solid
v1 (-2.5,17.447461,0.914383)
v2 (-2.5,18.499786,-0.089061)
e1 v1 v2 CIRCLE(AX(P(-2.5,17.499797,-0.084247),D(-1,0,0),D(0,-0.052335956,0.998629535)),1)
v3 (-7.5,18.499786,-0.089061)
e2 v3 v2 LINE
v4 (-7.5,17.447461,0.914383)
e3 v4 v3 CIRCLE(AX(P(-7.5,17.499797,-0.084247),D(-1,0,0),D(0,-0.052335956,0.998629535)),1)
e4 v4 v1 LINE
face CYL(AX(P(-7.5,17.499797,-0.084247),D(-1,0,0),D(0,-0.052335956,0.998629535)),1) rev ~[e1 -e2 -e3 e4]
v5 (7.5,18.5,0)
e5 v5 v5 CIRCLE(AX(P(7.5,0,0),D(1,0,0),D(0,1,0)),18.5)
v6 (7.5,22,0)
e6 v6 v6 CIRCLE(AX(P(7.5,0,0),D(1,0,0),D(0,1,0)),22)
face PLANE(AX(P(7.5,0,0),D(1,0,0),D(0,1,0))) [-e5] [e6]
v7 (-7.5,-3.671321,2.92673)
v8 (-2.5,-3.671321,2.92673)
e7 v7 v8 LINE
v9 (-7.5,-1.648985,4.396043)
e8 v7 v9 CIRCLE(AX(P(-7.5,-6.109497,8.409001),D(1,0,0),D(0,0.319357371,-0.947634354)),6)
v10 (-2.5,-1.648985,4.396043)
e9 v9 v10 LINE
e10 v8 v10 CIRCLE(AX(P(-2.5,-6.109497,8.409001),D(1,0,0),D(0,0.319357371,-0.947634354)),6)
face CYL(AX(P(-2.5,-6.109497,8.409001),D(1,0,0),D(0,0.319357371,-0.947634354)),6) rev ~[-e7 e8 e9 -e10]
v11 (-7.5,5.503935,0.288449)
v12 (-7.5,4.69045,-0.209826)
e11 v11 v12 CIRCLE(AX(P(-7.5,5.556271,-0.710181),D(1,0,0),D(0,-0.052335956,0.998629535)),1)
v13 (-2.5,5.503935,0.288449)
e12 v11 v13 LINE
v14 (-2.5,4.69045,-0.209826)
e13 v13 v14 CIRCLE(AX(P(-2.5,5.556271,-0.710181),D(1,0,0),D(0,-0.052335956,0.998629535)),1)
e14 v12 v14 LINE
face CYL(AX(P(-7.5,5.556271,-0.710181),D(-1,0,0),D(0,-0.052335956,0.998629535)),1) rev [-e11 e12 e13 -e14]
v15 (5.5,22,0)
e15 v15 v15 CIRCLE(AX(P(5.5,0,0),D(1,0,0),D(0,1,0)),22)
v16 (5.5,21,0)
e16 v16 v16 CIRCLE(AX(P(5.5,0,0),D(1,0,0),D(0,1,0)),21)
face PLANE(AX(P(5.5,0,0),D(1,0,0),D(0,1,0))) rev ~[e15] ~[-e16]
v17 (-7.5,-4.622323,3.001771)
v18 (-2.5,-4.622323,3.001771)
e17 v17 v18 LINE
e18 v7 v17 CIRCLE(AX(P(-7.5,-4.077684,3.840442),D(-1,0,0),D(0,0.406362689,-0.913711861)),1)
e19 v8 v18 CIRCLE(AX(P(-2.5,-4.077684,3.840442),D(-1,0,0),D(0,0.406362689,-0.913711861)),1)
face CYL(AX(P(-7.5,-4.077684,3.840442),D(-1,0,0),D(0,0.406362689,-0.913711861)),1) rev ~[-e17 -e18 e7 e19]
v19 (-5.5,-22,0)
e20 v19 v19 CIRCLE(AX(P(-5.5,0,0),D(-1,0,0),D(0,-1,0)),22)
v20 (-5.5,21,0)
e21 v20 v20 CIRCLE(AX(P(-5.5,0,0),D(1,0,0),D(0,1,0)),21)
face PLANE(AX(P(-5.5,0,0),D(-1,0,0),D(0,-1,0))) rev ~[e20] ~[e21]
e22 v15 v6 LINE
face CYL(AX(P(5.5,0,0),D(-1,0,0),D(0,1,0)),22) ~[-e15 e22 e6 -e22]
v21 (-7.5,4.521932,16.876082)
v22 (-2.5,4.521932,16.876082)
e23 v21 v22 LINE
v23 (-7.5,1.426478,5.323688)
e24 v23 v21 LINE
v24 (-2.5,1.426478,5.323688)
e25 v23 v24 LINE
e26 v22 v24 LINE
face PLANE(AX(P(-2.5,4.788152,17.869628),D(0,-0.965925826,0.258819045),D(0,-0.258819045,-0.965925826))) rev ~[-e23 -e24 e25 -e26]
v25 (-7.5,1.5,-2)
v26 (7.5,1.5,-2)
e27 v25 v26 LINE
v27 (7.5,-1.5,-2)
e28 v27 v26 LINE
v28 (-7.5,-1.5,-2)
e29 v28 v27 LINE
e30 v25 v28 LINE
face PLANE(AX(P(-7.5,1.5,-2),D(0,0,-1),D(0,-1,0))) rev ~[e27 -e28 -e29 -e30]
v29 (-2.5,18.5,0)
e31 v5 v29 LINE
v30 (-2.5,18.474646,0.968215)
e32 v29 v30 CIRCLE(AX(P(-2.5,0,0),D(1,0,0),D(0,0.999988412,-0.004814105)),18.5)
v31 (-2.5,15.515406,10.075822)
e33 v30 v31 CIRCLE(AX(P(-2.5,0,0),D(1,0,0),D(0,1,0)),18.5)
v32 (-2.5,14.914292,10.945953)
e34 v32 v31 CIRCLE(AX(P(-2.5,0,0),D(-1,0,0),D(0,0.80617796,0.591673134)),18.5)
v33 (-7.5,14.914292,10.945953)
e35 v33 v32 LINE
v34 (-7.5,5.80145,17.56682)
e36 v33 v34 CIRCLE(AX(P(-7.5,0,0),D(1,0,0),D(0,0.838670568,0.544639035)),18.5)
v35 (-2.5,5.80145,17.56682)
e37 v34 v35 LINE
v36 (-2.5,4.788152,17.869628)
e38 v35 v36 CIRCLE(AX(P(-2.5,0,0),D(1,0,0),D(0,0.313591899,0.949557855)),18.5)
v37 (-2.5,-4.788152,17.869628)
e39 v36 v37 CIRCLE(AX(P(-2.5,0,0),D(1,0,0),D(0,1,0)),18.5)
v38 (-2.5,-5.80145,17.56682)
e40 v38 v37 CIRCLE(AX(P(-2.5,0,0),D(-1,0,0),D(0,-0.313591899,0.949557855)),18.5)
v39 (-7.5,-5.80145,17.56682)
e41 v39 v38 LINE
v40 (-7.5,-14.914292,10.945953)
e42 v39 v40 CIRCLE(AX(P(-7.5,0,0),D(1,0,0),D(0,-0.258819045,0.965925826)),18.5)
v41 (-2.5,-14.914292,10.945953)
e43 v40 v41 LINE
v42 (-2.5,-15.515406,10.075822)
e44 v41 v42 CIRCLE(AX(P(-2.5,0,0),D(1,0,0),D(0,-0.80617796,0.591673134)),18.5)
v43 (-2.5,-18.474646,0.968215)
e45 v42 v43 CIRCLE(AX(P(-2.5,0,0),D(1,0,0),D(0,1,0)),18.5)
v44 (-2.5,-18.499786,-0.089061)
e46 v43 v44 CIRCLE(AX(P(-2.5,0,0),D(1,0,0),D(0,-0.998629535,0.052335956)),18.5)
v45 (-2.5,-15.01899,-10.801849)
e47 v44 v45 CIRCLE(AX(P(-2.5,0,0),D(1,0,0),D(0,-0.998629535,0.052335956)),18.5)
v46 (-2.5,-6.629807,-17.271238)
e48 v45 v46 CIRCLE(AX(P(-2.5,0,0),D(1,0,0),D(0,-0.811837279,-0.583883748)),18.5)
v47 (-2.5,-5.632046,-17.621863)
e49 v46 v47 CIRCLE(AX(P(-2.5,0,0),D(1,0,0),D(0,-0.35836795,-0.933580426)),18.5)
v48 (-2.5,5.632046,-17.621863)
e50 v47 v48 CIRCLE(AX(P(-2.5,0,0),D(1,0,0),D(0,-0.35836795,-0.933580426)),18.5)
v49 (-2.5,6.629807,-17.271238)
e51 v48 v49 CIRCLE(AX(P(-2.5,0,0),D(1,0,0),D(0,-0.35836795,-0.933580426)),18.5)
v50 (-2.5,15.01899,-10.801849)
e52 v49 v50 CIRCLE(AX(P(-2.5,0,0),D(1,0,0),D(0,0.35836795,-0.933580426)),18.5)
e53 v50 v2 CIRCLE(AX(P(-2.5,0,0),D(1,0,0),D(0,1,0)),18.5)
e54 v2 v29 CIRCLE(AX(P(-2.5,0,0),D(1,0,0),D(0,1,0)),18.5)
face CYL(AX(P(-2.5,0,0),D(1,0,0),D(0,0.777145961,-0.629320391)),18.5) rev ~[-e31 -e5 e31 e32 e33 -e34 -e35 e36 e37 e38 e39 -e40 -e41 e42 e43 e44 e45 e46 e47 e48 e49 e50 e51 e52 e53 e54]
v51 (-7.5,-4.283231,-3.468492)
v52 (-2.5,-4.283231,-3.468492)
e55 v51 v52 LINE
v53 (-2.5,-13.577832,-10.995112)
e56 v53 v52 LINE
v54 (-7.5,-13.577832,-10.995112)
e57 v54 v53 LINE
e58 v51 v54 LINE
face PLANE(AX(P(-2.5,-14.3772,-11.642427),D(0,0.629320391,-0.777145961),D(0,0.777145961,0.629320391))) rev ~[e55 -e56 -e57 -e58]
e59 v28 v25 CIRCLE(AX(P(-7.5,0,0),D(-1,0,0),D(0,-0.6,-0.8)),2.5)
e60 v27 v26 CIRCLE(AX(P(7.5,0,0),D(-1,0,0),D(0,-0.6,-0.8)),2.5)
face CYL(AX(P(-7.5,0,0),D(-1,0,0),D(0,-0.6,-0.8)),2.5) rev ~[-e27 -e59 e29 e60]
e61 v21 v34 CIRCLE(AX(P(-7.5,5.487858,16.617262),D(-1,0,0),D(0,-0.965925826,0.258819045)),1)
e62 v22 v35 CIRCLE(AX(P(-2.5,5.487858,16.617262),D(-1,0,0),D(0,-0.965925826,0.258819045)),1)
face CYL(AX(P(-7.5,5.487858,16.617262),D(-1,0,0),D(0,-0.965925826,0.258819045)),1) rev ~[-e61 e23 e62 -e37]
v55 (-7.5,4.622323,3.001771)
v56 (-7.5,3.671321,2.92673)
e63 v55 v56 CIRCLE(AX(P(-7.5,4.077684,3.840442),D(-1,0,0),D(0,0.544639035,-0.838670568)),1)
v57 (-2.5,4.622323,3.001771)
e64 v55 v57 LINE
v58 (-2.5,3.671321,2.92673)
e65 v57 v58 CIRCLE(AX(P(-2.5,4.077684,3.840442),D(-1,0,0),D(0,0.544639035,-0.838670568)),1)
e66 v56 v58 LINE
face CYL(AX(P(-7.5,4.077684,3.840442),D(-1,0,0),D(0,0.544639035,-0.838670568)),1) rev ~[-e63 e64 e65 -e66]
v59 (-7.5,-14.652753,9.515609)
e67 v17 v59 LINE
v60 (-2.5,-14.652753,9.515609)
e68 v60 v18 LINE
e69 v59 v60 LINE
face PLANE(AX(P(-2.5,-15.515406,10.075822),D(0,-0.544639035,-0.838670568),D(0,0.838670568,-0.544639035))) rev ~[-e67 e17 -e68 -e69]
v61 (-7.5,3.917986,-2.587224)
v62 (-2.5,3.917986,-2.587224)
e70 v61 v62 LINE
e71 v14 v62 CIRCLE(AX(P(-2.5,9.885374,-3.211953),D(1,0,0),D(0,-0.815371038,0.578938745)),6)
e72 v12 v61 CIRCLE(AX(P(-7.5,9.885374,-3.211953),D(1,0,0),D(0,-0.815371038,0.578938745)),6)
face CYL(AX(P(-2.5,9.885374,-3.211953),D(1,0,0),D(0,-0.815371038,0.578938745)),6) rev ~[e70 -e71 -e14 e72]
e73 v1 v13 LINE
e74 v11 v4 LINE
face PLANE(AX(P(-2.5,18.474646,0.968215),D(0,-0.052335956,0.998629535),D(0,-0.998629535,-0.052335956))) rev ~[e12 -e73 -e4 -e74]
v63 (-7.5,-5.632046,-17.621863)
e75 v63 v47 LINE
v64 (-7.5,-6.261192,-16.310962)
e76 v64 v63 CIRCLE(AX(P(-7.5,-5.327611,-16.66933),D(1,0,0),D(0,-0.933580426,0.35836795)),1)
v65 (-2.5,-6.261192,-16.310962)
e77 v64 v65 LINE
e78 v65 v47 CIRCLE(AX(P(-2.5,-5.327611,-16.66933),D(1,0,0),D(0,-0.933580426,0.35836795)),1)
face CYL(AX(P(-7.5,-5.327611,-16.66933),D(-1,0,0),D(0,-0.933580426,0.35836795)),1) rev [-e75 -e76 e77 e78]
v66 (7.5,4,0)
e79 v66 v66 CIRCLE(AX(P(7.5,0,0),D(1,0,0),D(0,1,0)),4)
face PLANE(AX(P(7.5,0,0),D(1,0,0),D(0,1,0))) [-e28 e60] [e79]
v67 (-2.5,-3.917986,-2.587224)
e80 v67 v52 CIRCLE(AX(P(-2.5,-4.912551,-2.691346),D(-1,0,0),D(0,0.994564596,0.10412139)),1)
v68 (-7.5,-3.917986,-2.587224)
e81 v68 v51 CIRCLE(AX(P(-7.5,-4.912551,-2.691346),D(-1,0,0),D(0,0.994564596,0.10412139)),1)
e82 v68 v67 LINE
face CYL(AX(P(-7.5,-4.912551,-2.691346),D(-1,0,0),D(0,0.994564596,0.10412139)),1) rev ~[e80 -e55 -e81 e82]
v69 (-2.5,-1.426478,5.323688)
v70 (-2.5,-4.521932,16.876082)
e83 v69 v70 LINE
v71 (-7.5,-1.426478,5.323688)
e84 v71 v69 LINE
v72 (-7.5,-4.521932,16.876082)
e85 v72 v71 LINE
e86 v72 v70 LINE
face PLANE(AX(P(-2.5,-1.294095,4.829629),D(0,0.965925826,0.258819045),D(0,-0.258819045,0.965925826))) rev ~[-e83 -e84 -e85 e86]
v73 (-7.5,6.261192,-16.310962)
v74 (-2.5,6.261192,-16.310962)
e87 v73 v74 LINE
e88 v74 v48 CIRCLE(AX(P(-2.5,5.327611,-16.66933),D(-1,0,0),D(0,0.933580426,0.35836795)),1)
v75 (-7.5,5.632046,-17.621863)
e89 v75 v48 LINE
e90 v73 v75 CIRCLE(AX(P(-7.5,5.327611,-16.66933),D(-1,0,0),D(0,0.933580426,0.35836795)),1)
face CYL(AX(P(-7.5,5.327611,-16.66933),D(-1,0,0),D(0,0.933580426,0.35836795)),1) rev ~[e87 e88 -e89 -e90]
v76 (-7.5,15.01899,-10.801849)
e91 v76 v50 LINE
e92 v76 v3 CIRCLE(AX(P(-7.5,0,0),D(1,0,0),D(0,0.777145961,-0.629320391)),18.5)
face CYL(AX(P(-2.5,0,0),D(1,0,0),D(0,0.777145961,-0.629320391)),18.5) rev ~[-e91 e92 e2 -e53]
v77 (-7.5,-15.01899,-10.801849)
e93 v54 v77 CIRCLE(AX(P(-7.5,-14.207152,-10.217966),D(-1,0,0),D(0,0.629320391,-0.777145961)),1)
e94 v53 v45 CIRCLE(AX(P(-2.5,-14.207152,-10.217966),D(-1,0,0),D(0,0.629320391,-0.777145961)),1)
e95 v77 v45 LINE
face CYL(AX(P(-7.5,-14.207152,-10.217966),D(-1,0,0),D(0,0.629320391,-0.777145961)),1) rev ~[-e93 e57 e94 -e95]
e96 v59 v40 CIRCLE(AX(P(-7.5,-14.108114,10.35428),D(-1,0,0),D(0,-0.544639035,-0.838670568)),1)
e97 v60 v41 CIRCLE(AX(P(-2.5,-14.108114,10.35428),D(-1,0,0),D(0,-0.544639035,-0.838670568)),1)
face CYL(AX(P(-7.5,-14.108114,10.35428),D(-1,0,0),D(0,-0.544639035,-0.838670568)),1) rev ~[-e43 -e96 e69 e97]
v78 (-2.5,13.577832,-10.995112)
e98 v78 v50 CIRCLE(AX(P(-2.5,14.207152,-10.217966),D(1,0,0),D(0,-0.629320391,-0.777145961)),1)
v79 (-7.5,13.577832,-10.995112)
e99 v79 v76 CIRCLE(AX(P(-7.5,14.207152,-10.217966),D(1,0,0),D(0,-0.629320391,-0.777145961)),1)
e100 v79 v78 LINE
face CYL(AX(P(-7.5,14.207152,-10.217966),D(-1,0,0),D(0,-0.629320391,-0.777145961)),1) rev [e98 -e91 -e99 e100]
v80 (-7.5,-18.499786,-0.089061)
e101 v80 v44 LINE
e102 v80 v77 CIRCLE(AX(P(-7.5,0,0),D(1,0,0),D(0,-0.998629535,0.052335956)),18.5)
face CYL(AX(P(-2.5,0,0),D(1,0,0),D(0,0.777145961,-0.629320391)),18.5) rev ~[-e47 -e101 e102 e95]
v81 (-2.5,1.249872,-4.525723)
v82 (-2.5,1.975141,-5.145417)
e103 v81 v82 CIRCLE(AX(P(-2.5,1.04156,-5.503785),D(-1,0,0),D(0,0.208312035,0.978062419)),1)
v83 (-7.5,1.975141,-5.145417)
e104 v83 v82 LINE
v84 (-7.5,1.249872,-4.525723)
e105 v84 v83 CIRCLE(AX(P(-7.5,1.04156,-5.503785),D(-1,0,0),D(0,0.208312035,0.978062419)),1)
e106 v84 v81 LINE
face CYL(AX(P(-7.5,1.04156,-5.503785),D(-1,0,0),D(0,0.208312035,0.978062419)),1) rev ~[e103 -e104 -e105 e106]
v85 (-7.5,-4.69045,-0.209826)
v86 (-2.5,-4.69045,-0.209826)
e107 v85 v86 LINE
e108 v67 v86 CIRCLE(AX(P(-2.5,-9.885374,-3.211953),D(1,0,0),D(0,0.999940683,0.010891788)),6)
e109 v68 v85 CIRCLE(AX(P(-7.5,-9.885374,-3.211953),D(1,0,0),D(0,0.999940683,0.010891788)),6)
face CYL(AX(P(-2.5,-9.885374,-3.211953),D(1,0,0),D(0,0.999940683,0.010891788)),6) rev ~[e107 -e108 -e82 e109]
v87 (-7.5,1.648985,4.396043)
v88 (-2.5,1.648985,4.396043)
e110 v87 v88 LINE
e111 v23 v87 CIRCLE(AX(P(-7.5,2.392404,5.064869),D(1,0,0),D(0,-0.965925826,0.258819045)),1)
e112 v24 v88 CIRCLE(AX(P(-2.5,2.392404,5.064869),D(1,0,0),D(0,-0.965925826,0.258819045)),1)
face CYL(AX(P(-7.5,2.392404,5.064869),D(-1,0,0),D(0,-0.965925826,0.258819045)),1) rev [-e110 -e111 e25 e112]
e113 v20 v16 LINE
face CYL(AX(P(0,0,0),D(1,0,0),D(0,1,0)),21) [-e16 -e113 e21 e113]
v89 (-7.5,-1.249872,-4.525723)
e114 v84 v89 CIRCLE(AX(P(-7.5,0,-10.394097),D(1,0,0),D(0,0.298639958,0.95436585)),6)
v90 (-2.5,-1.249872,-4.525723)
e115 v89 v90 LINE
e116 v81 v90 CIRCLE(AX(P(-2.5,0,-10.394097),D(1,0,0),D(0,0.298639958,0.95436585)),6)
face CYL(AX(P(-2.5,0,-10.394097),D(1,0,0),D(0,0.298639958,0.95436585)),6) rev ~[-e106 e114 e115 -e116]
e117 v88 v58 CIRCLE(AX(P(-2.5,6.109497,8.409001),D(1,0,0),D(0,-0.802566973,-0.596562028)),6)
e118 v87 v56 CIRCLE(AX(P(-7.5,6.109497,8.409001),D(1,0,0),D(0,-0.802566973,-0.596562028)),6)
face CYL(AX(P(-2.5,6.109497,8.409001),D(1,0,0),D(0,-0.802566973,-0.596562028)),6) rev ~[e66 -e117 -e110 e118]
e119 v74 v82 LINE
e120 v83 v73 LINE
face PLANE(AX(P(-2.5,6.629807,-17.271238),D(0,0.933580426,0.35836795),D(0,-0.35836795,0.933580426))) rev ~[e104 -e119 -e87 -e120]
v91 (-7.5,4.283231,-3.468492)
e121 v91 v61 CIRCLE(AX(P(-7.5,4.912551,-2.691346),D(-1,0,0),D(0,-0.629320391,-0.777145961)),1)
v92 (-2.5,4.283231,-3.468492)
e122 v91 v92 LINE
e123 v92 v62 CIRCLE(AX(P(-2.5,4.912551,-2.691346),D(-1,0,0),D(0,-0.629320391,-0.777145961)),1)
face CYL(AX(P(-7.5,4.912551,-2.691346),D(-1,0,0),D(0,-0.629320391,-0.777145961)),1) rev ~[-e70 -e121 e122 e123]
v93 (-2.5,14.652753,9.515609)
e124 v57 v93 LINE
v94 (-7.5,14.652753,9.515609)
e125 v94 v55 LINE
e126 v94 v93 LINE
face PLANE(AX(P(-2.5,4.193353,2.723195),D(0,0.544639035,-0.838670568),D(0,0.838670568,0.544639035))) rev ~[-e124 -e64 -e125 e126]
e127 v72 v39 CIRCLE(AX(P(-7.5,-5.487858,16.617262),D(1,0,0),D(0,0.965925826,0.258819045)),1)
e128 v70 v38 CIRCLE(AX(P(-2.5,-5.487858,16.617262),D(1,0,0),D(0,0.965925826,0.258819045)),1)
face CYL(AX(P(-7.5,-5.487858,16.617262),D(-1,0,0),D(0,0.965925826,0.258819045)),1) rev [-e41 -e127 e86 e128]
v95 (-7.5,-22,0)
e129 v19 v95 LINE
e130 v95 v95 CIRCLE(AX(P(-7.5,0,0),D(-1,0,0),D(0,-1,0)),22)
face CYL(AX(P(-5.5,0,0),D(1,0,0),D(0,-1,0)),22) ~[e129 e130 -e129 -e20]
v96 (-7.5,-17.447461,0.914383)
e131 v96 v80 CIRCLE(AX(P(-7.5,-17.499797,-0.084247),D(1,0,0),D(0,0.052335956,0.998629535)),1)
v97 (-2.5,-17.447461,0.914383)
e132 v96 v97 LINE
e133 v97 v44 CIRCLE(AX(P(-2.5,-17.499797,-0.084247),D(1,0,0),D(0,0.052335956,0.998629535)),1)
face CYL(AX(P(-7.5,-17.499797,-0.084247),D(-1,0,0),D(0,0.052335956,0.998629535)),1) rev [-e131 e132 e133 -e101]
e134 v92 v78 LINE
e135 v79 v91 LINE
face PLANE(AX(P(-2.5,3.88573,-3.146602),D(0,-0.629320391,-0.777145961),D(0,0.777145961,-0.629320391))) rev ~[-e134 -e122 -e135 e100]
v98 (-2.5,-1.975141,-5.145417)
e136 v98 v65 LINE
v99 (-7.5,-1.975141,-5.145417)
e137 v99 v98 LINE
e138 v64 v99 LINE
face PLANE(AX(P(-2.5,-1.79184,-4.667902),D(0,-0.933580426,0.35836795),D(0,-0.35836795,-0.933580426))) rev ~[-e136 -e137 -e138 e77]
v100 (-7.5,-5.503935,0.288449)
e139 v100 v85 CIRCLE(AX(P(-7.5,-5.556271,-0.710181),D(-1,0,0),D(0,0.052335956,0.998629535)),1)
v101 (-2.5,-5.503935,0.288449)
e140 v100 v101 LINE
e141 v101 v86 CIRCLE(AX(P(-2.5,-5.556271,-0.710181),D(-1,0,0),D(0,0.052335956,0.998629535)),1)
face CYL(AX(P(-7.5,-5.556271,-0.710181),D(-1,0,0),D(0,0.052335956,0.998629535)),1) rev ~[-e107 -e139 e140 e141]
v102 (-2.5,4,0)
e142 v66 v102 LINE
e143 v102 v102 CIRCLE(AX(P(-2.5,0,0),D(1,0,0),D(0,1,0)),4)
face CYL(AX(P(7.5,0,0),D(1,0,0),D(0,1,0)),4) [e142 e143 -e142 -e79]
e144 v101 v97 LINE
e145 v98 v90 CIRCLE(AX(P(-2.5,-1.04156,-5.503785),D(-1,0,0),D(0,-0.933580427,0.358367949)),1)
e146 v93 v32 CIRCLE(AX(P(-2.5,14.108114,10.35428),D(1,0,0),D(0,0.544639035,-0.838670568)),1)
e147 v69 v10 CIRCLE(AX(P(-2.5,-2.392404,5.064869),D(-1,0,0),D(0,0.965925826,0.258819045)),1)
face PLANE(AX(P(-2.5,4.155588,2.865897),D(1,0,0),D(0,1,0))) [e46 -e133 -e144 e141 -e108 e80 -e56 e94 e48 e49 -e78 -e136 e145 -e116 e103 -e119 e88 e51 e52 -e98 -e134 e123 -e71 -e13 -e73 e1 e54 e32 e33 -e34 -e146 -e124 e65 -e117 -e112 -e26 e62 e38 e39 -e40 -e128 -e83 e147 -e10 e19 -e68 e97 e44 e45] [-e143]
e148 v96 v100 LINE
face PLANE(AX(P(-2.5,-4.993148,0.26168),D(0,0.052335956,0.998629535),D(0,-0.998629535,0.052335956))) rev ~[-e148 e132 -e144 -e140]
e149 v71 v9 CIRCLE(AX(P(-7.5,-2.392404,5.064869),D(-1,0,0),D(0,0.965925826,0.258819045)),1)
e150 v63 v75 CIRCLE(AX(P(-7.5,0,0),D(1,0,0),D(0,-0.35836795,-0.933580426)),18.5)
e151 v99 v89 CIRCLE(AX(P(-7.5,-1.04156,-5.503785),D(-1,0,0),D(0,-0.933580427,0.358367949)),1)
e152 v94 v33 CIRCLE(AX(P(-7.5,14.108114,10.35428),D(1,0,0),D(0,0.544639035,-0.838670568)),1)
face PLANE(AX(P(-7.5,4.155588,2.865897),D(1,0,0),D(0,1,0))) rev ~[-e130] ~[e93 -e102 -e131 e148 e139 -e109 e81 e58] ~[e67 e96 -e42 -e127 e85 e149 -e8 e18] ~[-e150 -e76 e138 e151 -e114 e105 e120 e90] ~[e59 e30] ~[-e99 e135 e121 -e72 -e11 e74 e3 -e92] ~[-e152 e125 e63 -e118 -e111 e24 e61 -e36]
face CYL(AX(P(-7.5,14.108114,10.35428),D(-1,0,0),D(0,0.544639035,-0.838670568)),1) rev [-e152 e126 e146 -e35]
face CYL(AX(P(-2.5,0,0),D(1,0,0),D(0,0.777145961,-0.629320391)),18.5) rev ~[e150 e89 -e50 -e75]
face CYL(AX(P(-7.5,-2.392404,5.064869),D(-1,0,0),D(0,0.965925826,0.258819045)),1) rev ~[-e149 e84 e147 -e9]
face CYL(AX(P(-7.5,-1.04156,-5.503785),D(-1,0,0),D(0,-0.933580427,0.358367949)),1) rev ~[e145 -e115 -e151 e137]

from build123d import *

# Parameters (mm, degrees)
F0_R         = 21
F1_DEPTH     = 5.5
F2_R         = 22
F3_DEPTH     = 2
F4_R         = 22
F5_DEPTH     = 2
F7_DEPTH     = 15.001
F8_R         = 18.5
F8_R_2       = 4
F9_DEPTH     = 10
F11_DEPTH    = 5.001
F12_T1_DEPTH = 5


# Not quite as in the source:
# - a fillet or chamfer that OpenCascade refuses, or shapes differently, is made with other operations: its cross-section is extruded or revolved along the edge and cut away or added


with BuildPart() as f1:
    # F0 (on Right) → F1 (new body, symmetric)
    with BuildSketch(Plane.YZ):
        Circle(F0_R)
    extrude(amount=F1_DEPTH, both=True)

    # F2 (on face) → F3 (join)
    with BuildSketch(Plane.YZ.offset(5.5)):
        Circle(F2_R)
    extrude(amount=F3_DEPTH)

    # F4 (on face) → F5 (join)
    with BuildSketch(Plane(origin=(-5.5, 0, 0), x_dir=(0, -1, 0), z_dir=(-1, 0, 0))):
        Circle(F4_R)
    extrude(amount=F5_DEPTH)

    # F6 (on face) → F7 (cut, through all)
    with BuildSketch(Plane(origin=(-7.5, 0, 0), x_dir=(0, -1, 0), z_dir=(-1, 0, 0))):
        with BuildLine():
            Line((-1.5, -2), (1.5, -2))
            ThreePointArc((1.5, -2), (0, 2.5), (-1.5, -2))
        make_face()
    extrude(amount=-F7_DEPTH, mode=Mode.SUBTRACT)

    # F8 (on face) → F9 (cut)
    with BuildSketch(Plane.YZ.offset(7.5)):
        Circle(F8_R)
        Circle(F8_R_2, mode=Mode.SUBTRACT)
    extrude(amount=-F9_DEPTH, mode=Mode.SUBTRACT)

    # F10 (on face) → F11 (cut, through all)
    with BuildSketch(Plane.YZ.offset(-2.5)):
        with BuildLine():
            Line((4.7881523344, 17.8696277863), (1.2940952255, 4.8296291314))
            ThreePointArc((1.2940952255, 4.8296291314), (2.5827855501, 3.5548993357), (4.1933528397, 2.7231951751))
            Line((4.1933528397, 2.7231951751), (15.515405507, 10.0758221478))
            ThreePointArc((15.515405507, 10.0758221478), (10.8740271674, 14.9668143959), (4.7881523344, 17.8696277863))
        make_face()
        with BuildLine():
            ThreePointArc((4.9931476738, 0.2616797812), (4.1790348058, -1.3578507196), (3.8857298073, -3.1466019552))
            Line((3.8857298073, -3.1466019552), (14.377200287, -11.6424272344))
            ThreePointArc((14.377200287, -11.6424272344), (17.5945455515, -5.7168143959), (18.474646393, 0.9682151905))
            Line((18.474646393, 0.9682151905), (4.9931476738, 0.2616797812))
        make_face()
        with BuildLine():
            ThreePointArc((1.7918397477, -4.6679021325), (0, -4.3940972321), (-1.7918397477, -4.6679021325))
            Line((-1.7918397477, -4.6679021325), (-6.6298070666, -17.2712378902))
            ThreePointArc((-6.6298070666, -17.2712378902), (0, -18.5), (6.6298070666, -17.2712378902))
            Line((6.6298070666, -17.2712378902), (1.7918397477, -4.6679021325))
        make_face()
        with BuildLine():
            ThreePointArc((-3.8857298073, -3.1466019552), (-4.1790348058, -1.3578507196), (-4.9931476738, 0.2616797812))
            Line((-4.9931476738, 0.2616797812), (-18.474646393, 0.9682151905))
            ThreePointArc((-18.474646393, 0.9682151905), (-17.5945455515, -5.7168143959), (-14.377200287, -11.6424272344))
            Line((-14.377200287, -11.6424272344), (-3.8857298073, -3.1466019552))
        make_face()
        with BuildLine():
            ThreePointArc((-4.1933528397, 2.7231951751), (-2.5827855501, 3.5548993357), (-1.2940952255, 4.8296291314))
            Line((-1.2940952255, 4.8296291314), (-4.7881523344, 17.8696277863))
            ThreePointArc((-4.7881523344, 17.8696277863), (-10.8740271674, 14.9668143959), (-15.515405507, 10.0758221478))
            Line((-15.515405507, 10.0758221478), (-4.1933528397, 2.7231951751))
        make_face()
    extrude(amount=-F11_DEPTH, mode=Mode.SUBTRACT)

    # F12: fillet of radius 1 on 20 edges, made by hand

    # F12_s2 → F12_t1 (join)
    with BuildSketch(Plane.YZ.offset(-7.5)):
        with BuildLine():
            ThreePointArc((4.6223226532, 3.0017714292), (4.1563467345, 2.8435407412), (3.671320929, 2.9267301361))
            ThreePointArc((3.671320929, 2.9267301361), (3.9299597122, 2.8188656209), (4.1933528397, 2.7231951751))
            Line((4.1933528397, 2.7231951751), (4.6223226532, 3.0017714292))
        make_face()
        with BuildLine():
            ThreePointArc((1.4264780248, 5.3236884645), (1.4199861758, 4.831623059), (1.6489852086, 4.3960430429))
            ThreePointArc((1.6489852086, 4.3960430429), (1.466476179, 4.6086911748), (1.2940952255, 4.8296291314))
            Line((1.2940952255, 4.8296291314), (1.4264780248, 5.3236884645))
        make_face()
        with BuildLine():
            ThreePointArc((14.65275333, 9.5156092737), (15.0918050058, 10.1744115971), (14.9142922547, 10.9459529755))
            ThreePointArc((14.9142922547, 10.9459529755), (15.221067912, 10.5151838604), (15.515405507, 10.0758221478))
            Line((15.515405507, 10.0758221478), (14.65275333, 9.5156092737))
        make_face()
        with BuildLine():
            ThreePointArc((4.521932413, 16.8760815136), (5.0128162263, 17.4972255847), (5.8014501386, 17.5668203238))
            ThreePointArc((5.8014501386, 17.5668203238), (5.2969654732, 17.7254663345), (4.7881523344, 17.8696277863))
            Line((4.7881523344, 17.8696277863), (4.521932413, 16.8760815136))
        make_face()
        with BuildLine():
            ThreePointArc((5.5039345567, 0.2884489874), (5.0339464546, 0.1425665301), (4.6904498348, -0.2098261196))
            ThreePointArc((4.6904498348, -0.2098261196), (4.8362918345, 0.0294621688), (4.9931476738, 0.2616797812))
            Line((4.9931476738, 0.2616797812), (5.5039345567, 0.2884489874))
        make_face()
        with BuildLine():
            ThreePointArc((4.2832305314, -3.4684916949), (3.9887497267, -3.0742182326), (3.9179863263, -2.5872243429))
            ThreePointArc((3.9179863263, -2.5872243429), (3.8953248556, -2.8665364113), (3.8857298073, -3.1466019552))
            Line((3.8857298073, -3.1466019552), (4.2832305314, -3.4684916949))
        make_face()
        with BuildLine():
            ThreePointArc((1.2498722119, -4.5257227166), (1.6911638308, -4.7435120977), (1.9751406031, -5.1454171863))
            Line((1.9751406031, -5.1454171863), (1.7918397477, -4.6679021325))
            ThreePointArc((1.7918397477, -4.6679021325), (1.5225165542, -4.5904825531), (1.2498722119, -4.5257227166))
        make_face()
        with BuildLine():
            ThreePointArc((-1.9751406031, -5.1454171863), (-1.6911638308, -4.7435120977), (-1.2498722119, -4.5257227166))
            ThreePointArc((-1.2498722119, -4.5257227166), (-1.5225165542, -4.5904825531), (-1.7918397477, -4.6679021325))
            Line((-1.7918397477, -4.6679021325), (-1.9751406031, -5.1454171863))
        make_face()
        with BuildLine():
            ThreePointArc((-5.5039345567, 0.2884489874), (-5.0339464546, 0.1425665301), (-4.6904498348, -0.2098261196))
            ThreePointArc((-4.6904498348, -0.2098261196), (-4.8362918345, 0.0294621688), (-4.9931476738, 0.2616797812))
            Line((-4.9931476738, 0.2616797812), (-5.5039345567, 0.2884489874))
        make_face()
        with BuildLine():
            ThreePointArc((-3.9179863263, -2.5872243429), (-3.9887497267, -3.0742182326), (-4.2832305314, -3.4684916949))
            Line((-4.2832305314, -3.4684916949), (-3.8857298073, -3.1466019552))
            ThreePointArc((-3.8857298073, -3.1466019552), (-3.8953248556, -2.8665364113), (-3.9179863263, -2.5872243429))
        make_face()
        with BuildLine():
            ThreePointArc((-3.671320929, 2.9267301361), (-4.1563467345, 2.8435407412), (-4.6223226532, 3.0017714292))
            Line((-4.6223226532, 3.0017714292), (-4.1933528397, 2.7231951751))
            ThreePointArc((-4.1933528397, 2.7231951751), (-3.9299597122, 2.8188656209), (-3.671320929, 2.9267301361))
        make_face()
        with BuildLine():
            ThreePointArc((-1.4264780248, 5.3236884645), (-1.4199861758, 4.831623059), (-1.6489852086, 4.3960430429))
            ThreePointArc((-1.6489852086, 4.3960430429), (-1.466476179, 4.6086911748), (-1.2940952255, 4.8296291314))
            Line((-1.2940952255, 4.8296291314), (-1.4264780248, 5.3236884645))
        make_face()
        with BuildLine():
            ThreePointArc((13.5778319997, -10.9951115587), (14.3400646715, -11.2090934022), (15.0189896702, -10.8018493457))
            ThreePointArc((15.0189896702, -10.8018493457), (14.7041027879, -11.2267253108), (14.377200287, -11.6424272344))
            Line((14.377200287, -11.6424272344), (13.5778319997, -10.9951115587))
        make_face()
        with BuildLine():
            ThreePointArc((17.447461256, 0.9143826986), (18.189895813, 0.639468523), (18.4997856244, -0.0890609411))
            ThreePointArc((18.4997856244, -0.0890609411), (18.4947726116, 0.4397568007), (18.474646393, 0.9682151905))
            Line((18.474646393, 0.9682151905), (17.447461256, 0.9143826986))
        make_face()
        with BuildLine():
            ThreePointArc((6.2611916607, -16.3109619271), (6.229157638, -17.1020123027), (5.6320461618, -17.6218630125))
            ThreePointArc((5.6320461618, -17.6218630125), (6.133432615, -17.4536816849), (6.6298070666, -17.2712378902))
            Line((6.6298070666, -17.2712378902), (6.2611916607, -16.3109619271))
        make_face()
        with BuildLine():
            ThreePointArc((-6.2611916607, -16.3109619271), (-6.229157638, -17.1020123027), (-5.6320461618, -17.6218630125))
            ThreePointArc((-5.6320461618, -17.6218630125), (-6.133432615, -17.4536816849), (-6.6298070666, -17.2712378902))
            Line((-6.6298070666, -17.2712378902), (-6.2611916607, -16.3109619271))
        make_face()
        with BuildLine():
            ThreePointArc((-17.447461256, 0.9143826986), (-18.189895813, 0.639468523), (-18.4997856244, -0.0890609411))
            ThreePointArc((-18.4997856244, -0.0890609411), (-18.4947726116, 0.4397568007), (-18.474646393, 0.9682151905))
            Line((-18.474646393, 0.9682151905), (-17.447461256, 0.9143826986))
        make_face()
        with BuildLine():
            ThreePointArc((-13.5778319997, -10.9951115587), (-14.3400646715, -11.2090934022), (-15.0189896702, -10.8018493457))
            ThreePointArc((-15.0189896702, -10.8018493457), (-14.7041027879, -11.2267253108), (-14.377200287, -11.6424272344))
            Line((-14.377200287, -11.6424272344), (-13.5778319997, -10.9951115587))
        make_face()
        with BuildLine():
            ThreePointArc((-4.521932413, 16.8760815136), (-5.0128162263, 17.4972255847), (-5.8014501386, 17.5668203238))
            ThreePointArc((-5.8014501386, 17.5668203238), (-5.2969654732, 17.7254663345), (-4.7881523344, 17.8696277863))
            Line((-4.7881523344, 17.8696277863), (-4.521932413, 16.8760815136))
        make_face()
        with BuildLine():
            ThreePointArc((-14.65275333, 9.5156092737), (-15.0918050058, 10.1744115971), (-14.9142922547, 10.9459529755))
            ThreePointArc((-14.9142922547, 10.9459529755), (-15.221067912, 10.5151838604), (-15.515405507, 10.0758221478))
            Line((-15.515405507, 10.0758221478), (-14.65275333, 9.5156092737))
        make_face()
    extrude(amount=F12_T1_DEPTH)


solid = f1.part
